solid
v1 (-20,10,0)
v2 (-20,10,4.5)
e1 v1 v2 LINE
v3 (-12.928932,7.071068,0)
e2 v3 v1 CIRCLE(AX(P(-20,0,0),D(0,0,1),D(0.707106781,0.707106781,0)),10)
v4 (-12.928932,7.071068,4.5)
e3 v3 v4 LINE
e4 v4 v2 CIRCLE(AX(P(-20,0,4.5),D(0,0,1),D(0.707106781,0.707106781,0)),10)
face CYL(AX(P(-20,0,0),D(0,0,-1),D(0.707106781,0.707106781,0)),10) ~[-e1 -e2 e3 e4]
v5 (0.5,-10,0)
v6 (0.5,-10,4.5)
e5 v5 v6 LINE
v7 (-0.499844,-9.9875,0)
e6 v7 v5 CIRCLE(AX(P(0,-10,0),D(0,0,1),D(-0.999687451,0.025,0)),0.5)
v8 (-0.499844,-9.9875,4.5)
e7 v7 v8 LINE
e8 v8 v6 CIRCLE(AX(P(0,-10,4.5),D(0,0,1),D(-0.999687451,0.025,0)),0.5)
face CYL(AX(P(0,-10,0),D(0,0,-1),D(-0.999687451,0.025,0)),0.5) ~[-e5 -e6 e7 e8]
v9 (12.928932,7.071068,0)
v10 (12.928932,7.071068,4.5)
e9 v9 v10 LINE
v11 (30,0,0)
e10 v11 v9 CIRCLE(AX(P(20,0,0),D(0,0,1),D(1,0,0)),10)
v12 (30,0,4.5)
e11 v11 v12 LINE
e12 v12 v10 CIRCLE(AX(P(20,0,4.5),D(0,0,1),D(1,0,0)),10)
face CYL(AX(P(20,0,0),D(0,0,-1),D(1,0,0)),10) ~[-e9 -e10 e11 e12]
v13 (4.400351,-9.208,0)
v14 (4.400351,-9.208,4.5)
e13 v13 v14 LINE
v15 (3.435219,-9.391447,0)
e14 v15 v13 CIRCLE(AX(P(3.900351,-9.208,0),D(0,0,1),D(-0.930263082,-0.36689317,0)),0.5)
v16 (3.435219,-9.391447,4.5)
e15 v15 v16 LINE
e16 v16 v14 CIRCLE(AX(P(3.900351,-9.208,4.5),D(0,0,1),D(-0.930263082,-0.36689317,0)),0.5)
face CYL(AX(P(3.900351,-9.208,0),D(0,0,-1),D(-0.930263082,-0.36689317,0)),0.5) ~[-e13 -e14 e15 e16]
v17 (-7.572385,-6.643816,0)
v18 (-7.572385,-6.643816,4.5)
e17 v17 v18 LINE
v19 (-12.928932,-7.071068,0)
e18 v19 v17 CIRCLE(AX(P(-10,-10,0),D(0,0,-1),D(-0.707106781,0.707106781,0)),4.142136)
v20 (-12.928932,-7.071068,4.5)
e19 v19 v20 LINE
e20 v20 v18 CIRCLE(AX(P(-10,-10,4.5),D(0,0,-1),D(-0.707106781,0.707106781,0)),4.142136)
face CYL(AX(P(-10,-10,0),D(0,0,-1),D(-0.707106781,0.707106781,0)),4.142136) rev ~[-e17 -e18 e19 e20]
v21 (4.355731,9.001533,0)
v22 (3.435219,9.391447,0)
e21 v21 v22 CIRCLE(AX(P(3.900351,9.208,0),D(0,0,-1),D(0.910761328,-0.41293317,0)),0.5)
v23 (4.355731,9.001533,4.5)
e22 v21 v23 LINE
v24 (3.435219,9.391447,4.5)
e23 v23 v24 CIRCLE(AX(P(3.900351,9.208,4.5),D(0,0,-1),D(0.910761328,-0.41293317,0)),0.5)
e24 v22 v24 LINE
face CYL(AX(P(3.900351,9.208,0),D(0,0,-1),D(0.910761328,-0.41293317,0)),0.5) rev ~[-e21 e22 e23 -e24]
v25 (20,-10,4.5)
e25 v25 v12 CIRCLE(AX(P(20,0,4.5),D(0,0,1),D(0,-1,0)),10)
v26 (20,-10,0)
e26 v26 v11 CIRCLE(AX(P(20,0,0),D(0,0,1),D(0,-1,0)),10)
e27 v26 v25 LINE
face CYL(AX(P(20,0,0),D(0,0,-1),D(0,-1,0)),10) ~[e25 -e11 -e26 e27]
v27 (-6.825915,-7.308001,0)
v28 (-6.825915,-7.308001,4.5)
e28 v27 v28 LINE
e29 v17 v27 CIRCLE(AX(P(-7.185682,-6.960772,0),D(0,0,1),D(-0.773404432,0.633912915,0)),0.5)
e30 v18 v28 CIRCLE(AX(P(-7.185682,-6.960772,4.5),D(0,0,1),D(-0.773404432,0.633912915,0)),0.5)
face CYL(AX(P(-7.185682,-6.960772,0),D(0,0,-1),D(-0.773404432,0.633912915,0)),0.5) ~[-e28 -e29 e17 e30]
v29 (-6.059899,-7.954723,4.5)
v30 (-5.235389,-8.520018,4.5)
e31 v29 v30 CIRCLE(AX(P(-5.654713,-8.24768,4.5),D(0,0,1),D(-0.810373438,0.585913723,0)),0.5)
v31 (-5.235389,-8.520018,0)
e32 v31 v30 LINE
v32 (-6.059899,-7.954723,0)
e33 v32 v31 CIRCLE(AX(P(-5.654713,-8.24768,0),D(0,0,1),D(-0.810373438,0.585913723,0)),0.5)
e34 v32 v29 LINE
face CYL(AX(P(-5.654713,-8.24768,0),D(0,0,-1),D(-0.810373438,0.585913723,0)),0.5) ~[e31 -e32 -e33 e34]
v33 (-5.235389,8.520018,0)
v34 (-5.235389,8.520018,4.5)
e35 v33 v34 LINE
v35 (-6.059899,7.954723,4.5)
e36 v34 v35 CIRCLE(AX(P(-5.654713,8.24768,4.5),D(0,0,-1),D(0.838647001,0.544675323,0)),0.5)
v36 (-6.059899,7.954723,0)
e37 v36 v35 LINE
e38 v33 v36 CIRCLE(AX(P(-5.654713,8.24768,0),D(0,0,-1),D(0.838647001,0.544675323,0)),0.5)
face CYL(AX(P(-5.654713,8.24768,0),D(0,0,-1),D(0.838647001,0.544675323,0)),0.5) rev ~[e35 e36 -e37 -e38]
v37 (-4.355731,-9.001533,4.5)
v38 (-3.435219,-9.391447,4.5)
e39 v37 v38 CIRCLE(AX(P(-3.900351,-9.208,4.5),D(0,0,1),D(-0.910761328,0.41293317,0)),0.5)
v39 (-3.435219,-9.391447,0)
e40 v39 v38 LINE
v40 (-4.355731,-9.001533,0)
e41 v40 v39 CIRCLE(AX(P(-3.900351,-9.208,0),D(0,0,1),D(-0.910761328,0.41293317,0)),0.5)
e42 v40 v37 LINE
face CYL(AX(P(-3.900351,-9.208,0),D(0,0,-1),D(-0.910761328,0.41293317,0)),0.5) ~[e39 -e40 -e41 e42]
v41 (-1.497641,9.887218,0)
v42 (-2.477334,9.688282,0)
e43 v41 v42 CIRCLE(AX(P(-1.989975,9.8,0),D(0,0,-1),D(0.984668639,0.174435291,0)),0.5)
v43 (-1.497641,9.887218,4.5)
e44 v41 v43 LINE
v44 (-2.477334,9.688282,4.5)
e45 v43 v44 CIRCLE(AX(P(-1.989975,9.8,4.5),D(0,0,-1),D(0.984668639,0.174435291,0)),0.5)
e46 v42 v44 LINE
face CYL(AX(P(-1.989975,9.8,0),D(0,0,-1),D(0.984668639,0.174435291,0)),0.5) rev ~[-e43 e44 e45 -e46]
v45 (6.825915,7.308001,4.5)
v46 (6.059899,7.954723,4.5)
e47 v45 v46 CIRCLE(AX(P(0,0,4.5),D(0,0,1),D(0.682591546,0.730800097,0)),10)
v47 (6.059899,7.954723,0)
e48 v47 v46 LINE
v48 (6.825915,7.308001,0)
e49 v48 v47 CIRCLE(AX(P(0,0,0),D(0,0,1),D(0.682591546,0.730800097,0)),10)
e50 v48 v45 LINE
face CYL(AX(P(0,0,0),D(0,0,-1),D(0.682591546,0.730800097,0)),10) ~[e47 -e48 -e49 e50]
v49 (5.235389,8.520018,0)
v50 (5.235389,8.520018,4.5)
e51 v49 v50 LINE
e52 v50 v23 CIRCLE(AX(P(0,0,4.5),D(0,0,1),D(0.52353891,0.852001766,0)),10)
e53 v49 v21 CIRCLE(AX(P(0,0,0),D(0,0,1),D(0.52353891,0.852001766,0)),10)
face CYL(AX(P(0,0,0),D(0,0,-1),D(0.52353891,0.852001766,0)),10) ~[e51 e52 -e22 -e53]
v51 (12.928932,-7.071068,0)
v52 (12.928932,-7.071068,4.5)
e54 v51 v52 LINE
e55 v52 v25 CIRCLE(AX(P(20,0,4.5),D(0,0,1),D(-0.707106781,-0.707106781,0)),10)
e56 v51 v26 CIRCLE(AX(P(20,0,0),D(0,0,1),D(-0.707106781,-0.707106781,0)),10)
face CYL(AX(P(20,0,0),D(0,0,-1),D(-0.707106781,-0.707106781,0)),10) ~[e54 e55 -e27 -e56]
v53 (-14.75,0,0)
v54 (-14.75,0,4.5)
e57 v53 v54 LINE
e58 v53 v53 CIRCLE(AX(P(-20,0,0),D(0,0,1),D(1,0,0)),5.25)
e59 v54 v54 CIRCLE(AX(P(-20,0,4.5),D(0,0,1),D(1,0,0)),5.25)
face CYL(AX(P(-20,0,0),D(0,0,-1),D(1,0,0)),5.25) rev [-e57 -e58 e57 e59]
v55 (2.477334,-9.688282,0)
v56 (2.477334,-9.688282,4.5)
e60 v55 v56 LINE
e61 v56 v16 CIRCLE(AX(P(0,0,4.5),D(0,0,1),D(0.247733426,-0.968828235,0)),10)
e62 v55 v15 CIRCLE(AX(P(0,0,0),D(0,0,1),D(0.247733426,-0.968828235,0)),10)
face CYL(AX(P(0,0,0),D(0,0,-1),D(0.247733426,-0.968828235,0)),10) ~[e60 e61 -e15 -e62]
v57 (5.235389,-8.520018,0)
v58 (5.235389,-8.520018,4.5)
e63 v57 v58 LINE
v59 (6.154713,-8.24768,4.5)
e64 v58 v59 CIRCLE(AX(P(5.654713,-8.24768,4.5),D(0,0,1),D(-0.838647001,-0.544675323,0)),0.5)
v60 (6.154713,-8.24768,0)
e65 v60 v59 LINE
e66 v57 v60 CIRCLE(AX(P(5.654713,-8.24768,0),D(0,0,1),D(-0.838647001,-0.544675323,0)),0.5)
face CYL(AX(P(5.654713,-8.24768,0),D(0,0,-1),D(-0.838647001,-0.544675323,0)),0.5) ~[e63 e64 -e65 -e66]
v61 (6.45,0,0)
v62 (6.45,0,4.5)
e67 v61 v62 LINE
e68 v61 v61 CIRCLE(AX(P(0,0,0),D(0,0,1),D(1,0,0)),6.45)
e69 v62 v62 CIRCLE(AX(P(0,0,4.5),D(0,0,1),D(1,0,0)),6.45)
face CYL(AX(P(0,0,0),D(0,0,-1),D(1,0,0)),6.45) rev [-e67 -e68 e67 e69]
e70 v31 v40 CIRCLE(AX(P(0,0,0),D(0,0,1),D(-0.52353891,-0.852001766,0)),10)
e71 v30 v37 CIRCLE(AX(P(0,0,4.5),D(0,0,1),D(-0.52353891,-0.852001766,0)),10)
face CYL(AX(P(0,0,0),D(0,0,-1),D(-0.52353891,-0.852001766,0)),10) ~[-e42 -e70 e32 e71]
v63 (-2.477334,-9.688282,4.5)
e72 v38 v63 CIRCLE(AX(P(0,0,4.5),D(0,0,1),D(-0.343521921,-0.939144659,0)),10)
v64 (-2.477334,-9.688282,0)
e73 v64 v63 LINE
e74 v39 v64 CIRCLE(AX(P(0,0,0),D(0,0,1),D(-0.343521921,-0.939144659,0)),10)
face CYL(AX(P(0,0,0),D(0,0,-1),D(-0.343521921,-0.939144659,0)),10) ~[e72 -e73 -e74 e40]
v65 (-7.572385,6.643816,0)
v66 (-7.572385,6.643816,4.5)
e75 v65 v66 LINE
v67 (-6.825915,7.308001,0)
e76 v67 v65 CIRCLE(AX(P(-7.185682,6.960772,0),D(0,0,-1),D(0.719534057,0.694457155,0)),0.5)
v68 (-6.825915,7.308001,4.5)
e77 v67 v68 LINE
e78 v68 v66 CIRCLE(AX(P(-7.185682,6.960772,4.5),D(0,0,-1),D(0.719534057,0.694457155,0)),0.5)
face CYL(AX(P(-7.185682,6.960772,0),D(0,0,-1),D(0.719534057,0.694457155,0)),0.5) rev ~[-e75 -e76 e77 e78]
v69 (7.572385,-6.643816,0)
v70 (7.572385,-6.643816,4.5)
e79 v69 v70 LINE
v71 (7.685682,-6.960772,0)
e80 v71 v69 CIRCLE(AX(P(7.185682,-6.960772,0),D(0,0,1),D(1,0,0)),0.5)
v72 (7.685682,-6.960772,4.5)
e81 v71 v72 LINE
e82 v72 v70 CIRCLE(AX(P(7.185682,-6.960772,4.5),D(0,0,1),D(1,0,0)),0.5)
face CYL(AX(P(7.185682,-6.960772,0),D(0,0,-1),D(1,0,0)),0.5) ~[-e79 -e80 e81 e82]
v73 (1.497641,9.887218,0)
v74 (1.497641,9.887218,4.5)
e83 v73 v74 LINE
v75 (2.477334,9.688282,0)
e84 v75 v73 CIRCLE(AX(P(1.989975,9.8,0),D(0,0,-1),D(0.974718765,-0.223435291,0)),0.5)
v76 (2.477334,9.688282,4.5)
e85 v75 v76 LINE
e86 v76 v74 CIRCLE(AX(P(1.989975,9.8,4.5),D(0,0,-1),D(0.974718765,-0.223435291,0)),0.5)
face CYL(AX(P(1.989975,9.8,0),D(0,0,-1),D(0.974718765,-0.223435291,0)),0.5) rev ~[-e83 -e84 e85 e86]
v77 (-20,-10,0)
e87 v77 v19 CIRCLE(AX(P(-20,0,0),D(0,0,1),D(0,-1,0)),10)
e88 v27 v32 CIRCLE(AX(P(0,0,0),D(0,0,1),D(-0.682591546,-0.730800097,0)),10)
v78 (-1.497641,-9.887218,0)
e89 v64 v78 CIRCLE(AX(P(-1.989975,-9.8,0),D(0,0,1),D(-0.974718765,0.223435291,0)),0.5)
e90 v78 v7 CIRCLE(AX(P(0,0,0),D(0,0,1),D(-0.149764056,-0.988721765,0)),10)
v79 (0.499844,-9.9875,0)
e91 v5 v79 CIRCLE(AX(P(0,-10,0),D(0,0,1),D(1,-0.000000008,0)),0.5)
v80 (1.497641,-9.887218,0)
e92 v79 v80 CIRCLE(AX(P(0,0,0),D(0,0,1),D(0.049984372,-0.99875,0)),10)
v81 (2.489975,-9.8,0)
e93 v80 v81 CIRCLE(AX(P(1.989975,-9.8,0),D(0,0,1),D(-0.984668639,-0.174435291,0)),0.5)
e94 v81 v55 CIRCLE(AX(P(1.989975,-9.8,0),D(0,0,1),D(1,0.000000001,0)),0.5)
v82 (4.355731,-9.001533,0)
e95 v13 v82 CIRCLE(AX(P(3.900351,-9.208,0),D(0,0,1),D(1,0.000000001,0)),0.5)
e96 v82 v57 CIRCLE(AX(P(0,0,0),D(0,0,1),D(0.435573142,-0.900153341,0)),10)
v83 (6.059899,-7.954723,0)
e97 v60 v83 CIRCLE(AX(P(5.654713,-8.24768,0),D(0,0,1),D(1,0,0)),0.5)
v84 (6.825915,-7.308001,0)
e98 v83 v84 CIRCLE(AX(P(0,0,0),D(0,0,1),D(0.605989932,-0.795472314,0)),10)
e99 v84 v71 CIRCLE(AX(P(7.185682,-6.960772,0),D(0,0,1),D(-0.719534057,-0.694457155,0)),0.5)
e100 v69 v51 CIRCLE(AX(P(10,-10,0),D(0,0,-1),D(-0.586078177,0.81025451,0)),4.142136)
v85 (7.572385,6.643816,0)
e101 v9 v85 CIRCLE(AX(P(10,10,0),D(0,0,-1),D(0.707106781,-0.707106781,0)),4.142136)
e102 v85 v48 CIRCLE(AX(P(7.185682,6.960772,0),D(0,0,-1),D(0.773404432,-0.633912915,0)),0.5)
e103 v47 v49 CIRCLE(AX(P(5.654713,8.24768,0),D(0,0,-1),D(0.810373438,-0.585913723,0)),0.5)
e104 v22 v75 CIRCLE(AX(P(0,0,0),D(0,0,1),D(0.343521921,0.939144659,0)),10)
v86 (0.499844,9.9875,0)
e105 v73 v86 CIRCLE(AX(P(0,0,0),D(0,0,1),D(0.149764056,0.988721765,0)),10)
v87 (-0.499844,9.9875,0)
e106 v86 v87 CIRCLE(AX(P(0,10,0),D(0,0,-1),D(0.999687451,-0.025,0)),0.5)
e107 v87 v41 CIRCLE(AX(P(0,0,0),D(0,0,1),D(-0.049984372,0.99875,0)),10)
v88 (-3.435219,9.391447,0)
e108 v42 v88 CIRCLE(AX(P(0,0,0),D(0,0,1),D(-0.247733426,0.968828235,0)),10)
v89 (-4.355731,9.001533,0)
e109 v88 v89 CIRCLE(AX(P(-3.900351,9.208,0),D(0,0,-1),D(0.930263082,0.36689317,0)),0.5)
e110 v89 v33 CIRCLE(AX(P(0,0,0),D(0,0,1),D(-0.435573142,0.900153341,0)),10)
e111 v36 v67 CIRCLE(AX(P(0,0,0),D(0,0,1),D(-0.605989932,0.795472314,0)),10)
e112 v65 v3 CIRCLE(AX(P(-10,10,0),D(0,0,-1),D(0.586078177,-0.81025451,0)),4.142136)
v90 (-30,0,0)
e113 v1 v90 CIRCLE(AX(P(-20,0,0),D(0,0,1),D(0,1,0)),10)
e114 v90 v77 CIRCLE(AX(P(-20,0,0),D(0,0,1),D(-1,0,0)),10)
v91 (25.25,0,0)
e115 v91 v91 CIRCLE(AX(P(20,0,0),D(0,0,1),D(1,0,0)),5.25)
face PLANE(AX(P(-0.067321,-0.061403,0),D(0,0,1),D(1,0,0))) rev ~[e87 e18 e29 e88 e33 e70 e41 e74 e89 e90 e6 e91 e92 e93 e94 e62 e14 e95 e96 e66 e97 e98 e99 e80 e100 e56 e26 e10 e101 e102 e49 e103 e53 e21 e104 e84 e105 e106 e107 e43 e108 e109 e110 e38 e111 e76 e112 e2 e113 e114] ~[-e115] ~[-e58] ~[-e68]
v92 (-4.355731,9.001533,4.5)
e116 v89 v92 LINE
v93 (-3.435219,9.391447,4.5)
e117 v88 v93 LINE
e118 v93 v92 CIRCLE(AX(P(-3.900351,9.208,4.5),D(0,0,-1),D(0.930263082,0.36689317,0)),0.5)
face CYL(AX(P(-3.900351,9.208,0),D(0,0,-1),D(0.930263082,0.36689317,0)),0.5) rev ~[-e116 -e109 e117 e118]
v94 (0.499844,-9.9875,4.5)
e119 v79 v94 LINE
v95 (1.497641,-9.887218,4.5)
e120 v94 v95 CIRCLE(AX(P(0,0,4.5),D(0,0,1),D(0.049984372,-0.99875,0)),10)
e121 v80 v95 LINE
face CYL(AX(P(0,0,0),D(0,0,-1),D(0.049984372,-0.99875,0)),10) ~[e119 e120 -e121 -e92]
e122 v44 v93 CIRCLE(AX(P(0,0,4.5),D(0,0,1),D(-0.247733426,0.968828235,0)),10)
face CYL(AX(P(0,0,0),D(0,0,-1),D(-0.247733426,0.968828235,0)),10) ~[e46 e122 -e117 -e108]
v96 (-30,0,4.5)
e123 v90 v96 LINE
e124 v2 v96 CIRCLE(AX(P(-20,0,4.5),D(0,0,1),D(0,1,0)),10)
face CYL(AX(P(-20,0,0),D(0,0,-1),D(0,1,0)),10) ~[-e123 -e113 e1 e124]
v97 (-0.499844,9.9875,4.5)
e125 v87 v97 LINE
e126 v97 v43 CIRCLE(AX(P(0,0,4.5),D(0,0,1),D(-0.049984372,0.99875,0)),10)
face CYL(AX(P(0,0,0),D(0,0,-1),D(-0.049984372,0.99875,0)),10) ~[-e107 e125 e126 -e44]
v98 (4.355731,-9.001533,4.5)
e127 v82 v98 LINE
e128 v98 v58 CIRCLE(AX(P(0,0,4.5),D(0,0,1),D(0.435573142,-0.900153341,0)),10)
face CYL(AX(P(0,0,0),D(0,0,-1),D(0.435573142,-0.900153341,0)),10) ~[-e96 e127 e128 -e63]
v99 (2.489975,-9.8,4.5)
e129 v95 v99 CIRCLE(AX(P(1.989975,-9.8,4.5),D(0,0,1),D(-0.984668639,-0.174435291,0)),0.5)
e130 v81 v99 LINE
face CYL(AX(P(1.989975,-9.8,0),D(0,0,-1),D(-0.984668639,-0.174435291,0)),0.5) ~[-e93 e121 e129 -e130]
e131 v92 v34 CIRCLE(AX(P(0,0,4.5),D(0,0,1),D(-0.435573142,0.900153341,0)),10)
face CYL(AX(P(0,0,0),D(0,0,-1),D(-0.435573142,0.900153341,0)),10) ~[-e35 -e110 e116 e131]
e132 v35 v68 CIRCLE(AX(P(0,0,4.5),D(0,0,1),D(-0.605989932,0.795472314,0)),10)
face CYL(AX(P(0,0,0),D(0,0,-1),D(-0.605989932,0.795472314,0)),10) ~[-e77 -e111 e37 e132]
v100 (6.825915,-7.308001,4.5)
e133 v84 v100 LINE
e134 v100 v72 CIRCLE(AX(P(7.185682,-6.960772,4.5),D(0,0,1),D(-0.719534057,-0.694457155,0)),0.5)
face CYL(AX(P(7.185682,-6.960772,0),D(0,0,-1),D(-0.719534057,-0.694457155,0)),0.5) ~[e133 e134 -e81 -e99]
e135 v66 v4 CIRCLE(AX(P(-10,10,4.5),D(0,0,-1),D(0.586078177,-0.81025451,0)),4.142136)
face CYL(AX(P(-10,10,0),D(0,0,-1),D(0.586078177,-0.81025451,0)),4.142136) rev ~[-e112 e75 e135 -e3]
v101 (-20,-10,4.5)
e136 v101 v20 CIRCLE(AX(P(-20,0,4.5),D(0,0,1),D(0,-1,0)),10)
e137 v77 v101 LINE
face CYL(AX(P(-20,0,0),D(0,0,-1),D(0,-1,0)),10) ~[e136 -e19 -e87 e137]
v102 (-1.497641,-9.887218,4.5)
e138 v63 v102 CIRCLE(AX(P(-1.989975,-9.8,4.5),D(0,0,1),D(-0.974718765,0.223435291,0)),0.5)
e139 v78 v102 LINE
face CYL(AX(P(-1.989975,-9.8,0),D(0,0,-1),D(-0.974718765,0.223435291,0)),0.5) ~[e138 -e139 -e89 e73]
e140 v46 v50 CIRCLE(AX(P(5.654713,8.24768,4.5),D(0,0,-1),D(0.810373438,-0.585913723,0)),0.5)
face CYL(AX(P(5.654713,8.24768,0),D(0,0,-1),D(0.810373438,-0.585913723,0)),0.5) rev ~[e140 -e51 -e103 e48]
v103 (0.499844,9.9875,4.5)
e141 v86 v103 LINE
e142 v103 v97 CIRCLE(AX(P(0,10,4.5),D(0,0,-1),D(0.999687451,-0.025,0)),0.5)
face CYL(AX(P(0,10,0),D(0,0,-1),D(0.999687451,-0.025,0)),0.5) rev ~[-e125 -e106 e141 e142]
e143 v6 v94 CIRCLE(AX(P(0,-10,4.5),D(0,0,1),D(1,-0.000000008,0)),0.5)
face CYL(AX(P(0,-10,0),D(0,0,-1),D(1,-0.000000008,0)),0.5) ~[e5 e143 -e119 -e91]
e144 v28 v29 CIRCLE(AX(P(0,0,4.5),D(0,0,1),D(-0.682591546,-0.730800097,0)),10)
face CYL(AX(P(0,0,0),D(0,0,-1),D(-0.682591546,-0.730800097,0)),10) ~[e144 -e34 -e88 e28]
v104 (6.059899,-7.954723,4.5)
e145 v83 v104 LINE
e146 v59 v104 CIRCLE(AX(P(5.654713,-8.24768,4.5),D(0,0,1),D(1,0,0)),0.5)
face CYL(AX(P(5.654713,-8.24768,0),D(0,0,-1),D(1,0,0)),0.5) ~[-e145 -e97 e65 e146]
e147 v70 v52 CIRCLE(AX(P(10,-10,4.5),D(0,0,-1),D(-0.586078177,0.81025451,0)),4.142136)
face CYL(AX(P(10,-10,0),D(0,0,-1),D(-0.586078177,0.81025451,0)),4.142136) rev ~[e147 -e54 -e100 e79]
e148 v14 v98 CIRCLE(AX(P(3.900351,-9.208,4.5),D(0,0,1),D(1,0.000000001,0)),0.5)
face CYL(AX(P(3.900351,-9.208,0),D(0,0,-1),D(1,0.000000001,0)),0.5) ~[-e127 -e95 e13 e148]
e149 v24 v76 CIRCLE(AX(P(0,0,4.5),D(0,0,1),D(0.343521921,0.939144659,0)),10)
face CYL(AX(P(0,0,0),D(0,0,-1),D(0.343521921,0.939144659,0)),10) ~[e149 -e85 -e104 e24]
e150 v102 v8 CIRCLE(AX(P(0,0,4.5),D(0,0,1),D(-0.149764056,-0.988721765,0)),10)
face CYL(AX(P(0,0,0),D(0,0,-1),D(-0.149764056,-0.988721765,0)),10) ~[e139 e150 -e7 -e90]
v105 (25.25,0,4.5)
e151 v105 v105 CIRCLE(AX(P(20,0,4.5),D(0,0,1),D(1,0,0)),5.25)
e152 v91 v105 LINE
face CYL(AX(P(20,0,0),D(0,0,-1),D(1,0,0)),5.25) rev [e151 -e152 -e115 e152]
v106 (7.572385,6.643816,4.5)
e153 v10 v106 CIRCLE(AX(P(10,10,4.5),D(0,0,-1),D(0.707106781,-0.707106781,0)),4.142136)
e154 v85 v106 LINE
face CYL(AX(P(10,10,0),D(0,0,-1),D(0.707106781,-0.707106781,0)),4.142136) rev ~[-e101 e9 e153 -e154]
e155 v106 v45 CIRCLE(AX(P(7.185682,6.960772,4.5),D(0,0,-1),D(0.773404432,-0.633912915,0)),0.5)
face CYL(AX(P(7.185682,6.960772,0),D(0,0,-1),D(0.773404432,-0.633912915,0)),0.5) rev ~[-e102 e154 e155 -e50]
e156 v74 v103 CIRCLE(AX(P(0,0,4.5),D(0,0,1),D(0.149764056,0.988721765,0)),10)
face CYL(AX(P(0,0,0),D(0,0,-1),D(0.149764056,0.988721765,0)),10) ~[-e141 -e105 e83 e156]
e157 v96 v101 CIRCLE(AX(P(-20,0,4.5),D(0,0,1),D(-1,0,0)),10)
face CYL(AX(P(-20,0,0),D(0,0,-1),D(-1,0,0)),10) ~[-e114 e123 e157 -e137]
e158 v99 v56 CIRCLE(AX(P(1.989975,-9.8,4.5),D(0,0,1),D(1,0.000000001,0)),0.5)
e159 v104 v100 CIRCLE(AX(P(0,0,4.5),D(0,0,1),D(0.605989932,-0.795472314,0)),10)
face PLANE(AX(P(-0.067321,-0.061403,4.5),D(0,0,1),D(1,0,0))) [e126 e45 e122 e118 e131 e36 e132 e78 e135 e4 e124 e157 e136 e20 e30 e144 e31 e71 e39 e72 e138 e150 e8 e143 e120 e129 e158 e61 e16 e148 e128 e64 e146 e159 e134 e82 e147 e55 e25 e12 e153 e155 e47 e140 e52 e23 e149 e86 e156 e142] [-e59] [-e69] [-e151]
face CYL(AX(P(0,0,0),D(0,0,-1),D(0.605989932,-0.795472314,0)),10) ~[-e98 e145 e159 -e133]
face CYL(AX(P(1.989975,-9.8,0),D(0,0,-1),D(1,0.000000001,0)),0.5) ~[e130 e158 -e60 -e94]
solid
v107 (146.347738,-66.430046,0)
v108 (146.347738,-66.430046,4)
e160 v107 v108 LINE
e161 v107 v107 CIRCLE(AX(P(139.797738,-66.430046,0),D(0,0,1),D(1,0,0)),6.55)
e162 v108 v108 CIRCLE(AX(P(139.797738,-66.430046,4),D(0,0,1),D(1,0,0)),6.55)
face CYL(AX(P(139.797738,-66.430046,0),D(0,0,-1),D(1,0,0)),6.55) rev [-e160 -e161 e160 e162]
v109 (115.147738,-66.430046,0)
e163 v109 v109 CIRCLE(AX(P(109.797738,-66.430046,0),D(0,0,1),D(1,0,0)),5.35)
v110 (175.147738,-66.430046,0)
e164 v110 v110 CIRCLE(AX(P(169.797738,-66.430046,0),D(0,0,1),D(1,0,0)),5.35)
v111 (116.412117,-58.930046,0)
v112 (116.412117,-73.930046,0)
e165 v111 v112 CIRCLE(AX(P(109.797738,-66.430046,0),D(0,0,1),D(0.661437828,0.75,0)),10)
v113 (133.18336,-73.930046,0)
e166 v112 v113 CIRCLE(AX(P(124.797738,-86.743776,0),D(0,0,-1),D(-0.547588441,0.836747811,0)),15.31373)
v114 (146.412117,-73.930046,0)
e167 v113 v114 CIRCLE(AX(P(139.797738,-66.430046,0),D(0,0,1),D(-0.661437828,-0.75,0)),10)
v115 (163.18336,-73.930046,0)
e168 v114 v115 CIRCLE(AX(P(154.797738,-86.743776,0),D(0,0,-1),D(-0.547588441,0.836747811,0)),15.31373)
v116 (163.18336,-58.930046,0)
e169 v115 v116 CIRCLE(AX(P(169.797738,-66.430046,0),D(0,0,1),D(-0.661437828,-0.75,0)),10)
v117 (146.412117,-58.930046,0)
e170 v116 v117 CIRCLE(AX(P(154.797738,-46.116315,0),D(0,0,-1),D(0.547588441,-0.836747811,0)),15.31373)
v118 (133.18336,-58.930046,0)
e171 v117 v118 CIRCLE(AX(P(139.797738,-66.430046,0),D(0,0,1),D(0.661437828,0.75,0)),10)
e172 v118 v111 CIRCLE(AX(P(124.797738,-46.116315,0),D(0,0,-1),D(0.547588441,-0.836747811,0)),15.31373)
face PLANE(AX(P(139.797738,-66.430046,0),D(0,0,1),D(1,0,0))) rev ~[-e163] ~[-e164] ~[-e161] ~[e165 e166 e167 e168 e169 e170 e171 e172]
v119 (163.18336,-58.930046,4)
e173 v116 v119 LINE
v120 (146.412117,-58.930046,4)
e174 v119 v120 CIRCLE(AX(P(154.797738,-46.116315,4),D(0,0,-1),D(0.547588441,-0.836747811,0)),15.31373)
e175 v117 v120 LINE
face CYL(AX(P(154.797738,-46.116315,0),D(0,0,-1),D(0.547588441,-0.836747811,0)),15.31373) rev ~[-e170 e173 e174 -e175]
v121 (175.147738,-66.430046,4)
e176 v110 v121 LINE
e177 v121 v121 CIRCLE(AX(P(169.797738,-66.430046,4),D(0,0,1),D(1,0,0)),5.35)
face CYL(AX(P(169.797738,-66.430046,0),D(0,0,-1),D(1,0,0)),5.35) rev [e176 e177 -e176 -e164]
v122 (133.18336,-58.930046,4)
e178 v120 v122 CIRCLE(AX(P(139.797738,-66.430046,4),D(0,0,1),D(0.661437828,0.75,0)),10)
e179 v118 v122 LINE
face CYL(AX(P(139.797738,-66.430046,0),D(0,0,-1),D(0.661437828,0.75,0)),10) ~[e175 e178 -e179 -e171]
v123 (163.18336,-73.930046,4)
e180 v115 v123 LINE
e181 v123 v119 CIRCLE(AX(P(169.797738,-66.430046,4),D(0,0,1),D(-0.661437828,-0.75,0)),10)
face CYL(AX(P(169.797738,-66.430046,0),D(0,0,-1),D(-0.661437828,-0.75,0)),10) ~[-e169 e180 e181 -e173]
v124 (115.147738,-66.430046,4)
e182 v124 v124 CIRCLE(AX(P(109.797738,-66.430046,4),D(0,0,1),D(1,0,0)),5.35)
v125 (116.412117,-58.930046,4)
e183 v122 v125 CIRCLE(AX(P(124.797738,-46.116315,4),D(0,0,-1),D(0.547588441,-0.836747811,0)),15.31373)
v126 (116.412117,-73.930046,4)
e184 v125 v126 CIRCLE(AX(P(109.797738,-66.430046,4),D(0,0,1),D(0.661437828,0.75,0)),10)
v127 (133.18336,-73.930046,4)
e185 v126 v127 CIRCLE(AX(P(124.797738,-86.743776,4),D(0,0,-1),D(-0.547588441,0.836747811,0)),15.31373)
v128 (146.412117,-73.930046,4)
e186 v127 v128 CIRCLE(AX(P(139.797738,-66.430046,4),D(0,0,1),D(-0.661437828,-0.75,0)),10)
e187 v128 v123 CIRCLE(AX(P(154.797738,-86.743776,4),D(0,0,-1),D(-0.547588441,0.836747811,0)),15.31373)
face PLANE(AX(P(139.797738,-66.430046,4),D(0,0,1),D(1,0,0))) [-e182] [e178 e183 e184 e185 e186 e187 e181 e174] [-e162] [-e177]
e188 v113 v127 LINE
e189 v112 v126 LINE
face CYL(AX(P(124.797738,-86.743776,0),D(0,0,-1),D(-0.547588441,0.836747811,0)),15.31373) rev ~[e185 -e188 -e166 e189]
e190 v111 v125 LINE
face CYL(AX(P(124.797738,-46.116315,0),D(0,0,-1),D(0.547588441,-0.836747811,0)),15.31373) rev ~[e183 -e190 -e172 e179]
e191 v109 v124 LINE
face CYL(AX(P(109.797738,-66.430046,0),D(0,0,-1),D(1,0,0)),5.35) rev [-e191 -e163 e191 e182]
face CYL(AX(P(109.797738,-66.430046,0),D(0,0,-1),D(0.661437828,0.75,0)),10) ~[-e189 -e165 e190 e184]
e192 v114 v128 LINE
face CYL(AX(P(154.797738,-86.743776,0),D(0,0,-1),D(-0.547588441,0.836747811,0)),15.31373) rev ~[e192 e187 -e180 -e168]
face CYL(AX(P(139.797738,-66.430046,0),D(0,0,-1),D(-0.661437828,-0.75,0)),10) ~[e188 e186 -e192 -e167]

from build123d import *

# Parameters (mm, degrees)
F0_R     = 5.25
F0_R_2   = 6.45
F1_DEPTH = 4.5
F3_R     = 5.35
F3_R_2   = 6.55
F4_DEPTH = 4


with BuildPart() as f1:
    # F0 (on Top) → F1 (new body)
    with BuildSketch(Plane.XY):
        with BuildLine():
            ThreePointArc((12.9289321881, -7.0710678119), (16.1731656763, -9.2387953251), (20, -10))
            ThreePointArc((20, -10), (27.0710678119, -7.0710678119), (30, 0))
            ThreePointArc((30, 0), (23.8268343237, 9.2387953251), (12.9289321881, 7.0710678119))
            ThreePointArc((12.9289321881, 7.0710678119), (10.3293413121, 5.870978103), (7.5723847064, 6.64381593))
            ThreePointArc((7.5723847064, 6.64381593), (6.8533170042, 6.5872309794), (6.8259154618, 7.3080009653))
            ThreePointArc((6.8259154618, 7.3080009653), (6.451016823, 7.6409673438), (6.0598993217, 7.9547231386))
            ThreePointArc((6.0598993217, 7.9547231386), (5.3719769724, 7.835296), (5.235389102, 8.5200176614))
            ThreePointArc((5.235389102, 8.5200176614), (4.8016, 8.7718092455), (4.3557314175, 9.0015334148))
            ThreePointArc((4.3557314175, 9.0015334148), (3.7053332158, 8.7476), (3.4352192125, 9.3914465852))
            ThreePointArc((3.4352192125, 9.3914465852), (2.96, 9.5518793962), (2.4773342567, 9.6882823545))
            ThreePointArc((2.4773342567, 9.6882823545), (1.8904761305, 9.31), (1.4976405546, 9.8872176455))
            ThreePointArc((1.4976405546, 9.8872176455), (1, 9.9498743711), (0.4998437256, 9.9875))
            ThreePointArc((0.4998437256, 9.9875), (0, 9.5), (-0.4998437256, 9.9875))
            ThreePointArc((-0.4998437256, 9.9875), (-1, 9.9498743711), (-1.4976405546, 9.8872176455))
            ThreePointArc((-1.4976405546, 9.8872176455), (-1.8904761305, 9.31), (-2.4773342567, 9.6882823545))
            ThreePointArc((-2.4773342567, 9.6882823545), (-2.96, 9.5518793962), (-3.4352192125, 9.3914465852))
            ThreePointArc((-3.4352192125, 9.3914465852), (-3.7053332158, 8.7476), (-4.3557314175, 9.0015334148))
            ThreePointArc((-4.3557314175, 9.0015334148), (-4.8016, 8.7718092455), (-5.235389102, 8.5200176614))
            ThreePointArc((-5.235389102, 8.5200176614), (-5.3719769724, 7.835296), (-6.0598993217, 7.9547231386))
            ThreePointArc((-6.0598993217, 7.9547231386), (-6.451016823, 7.6409673438), (-6.8259154618, 7.3080009653))
            ThreePointArc((-6.8259154618, 7.3080009653), (-6.8533170042, 6.5872309794), (-7.5723847064, 6.64381593))
            ThreePointArc((-7.5723847064, 6.64381593), (-10.3293413121, 5.870978103), (-12.9289321881, 7.0710678119))
            ThreePointArc((-12.9289321881, 7.0710678119), (-16.1731656763, 9.2387953251), (-20, 10))
            ThreePointArc((-20, 10), (-27.0710678119, 7.0710678119), (-30, 0))
            ThreePointArc((-30, 0), (-27.0710678119, -7.0710678119), (-20, -10))
            ThreePointArc((-20, -10), (-16.1731656763, -9.2387953251), (-12.9289321881, -7.0710678119))
            ThreePointArc((-12.9289321881, -7.0710678119), (-10.3293413121, -5.870978103), (-7.5723847064, -6.64381593))
            ThreePointArc((-7.5723847064, -6.64381593), (-7.0173838095, -6.489948053), (-6.6856824903, -6.9607723876))
            ThreePointArc((-6.6856824903, -6.9607723876), (-6.7220643747, -7.1480108528), (-6.8259154618, -7.3080009653))
            ThreePointArc((-6.8259154618, -7.3080009653), (-6.451016823, -7.6409673438), (-6.0598993217, -7.9547231386))
            ThreePointArc((-6.0598993217, -7.9547231386), (-5.5007537762, -7.7719734941), (-5.1547126026, -8.24768))
            ThreePointArc((-5.1547126026, -8.24768), (-5.1753058075, -8.3896980441), (-5.235389102, -8.5200176614))
            ThreePointArc((-5.235389102, -8.5200176614), (-4.8016, -8.7718092455), (-4.3557314175, -9.0015334148))
            ThreePointArc((-4.3557314175, -9.0015334148), (-3.794734306, -8.7192821202), (-3.4003507535, -9.208))
            ThreePointArc((-3.4003507535, -9.208), (-3.4091452107, -9.3013654902), (-3.4352192125, -9.3914465852))
            ThreePointArc((-3.4352192125, -9.3914465852), (-2.96, -9.5518793962), (-2.4773342567, -9.6882823545))
            ThreePointArc((-2.4773342567, -9.6882823545), (-1.9337596238, -9.3031702046), (-1.4899748742, -9.8))
            ThreePointArc((-1.4899748742, -9.8), (-1.4918949811, -9.8437769355), (-1.4976405546, -9.8872176455))
            ThreePointArc((-1.4976405546, -9.8872176455), (-1, -9.9498743711), (-0.4998437256, -9.9875))
            ThreePointArc((-0.4998437256, -9.9875), (0, -9.5), (0.4998437256, -9.9875))
            ThreePointArc((0.4998437256, -9.9875), (1, -9.9498743711), (1.4976405546, -9.8872176455))
            ThreePointArc((1.4976405546, -9.8872176455), (1.8904761305, -9.31), (2.4773342567, -9.6882823545))
            ThreePointArc((2.4773342567, -9.6882823545), (2.96, -9.5518793962), (3.4352192125, -9.3914465852))
            ThreePointArc((3.4352192125, -9.3914465852), (3.7053332158, -8.7476), (4.3557314175, -9.0015334148))
            ThreePointArc((4.3557314175, -9.0015334148), (4.8016, -8.7718092455), (5.235389102, -8.5200176614))
            ThreePointArc((5.235389102, -8.5200176614), (5.3719769724, -7.835296), (6.0598993217, -7.9547231386))
            ThreePointArc((6.0598993217, -7.9547231386), (6.451016823, -7.6409673438), (6.8259154618, -7.3080009653))
            ThreePointArc((6.8259154618, -7.3080009653), (6.8533170042, -6.5872309794), (7.5723847064, -6.64381593))
            ThreePointArc((7.5723847064, -6.64381593), (10.3293413121, -5.870978103), (12.9289321881, -7.0710678119))
        make_face()
        with Locations((-20, 0)):
            Circle(F0_R, mode=Mode.SUBTRACT)
        Circle(F0_R_2, mode=Mode.SUBTRACT)
        with Locations((20, 0)):
            Circle(F0_R, mode=Mode.SUBTRACT)
        with BuildLine():
            ThreePointArc((7.6856824903, -6.9607723876), (7.6565068249, -6.7924737068), (7.5723847064, -6.64381593))
            ThreePointArc((7.5723847064, -6.64381593), (7.3132200921, -6.8474611419), (7.0710678119, -7.0710678119))
            ThreePointArc((7.0710678119, -7.0710678119), (6.9495014466, -7.1905792286), (6.8259154618, -7.3080009653))
            ThreePointArc((6.8259154618, -7.3080009653), (7.3729209555, -7.4243905032), (7.6856824903, -6.9607723876))
        make_face()
        with BuildLine():
            ThreePointArc((7.0710678119, -7.0710678119), (7.3132200921, -6.8474611419), (7.5723847064, -6.64381593))
            ThreePointArc((7.5723847064, -6.64381593), (6.8533170042, -6.5872309794), (6.8259154618, -7.3080009653))
            ThreePointArc((6.8259154618, -7.3080009653), (6.9495014466, -7.1905792286), (7.0710678119, -7.0710678119))
        make_face()
        with BuildLine():
            ThreePointArc((6.1547126026, -8.24768), (6.1304191085, -8.0937211736), (6.0598993217, -7.9547231386))
            ThreePointArc((6.0598993217, -7.9547231386), (5.6547126026, -8.24768), (5.235389102, -8.5200176614))
            ThreePointArc((5.235389102, -8.5200176614), (5.7967306467, -8.7270867951), (6.1547126026, -8.24768))
        make_face()
        with BuildLine():
            ThreePointArc((5.235389102, -8.5200176614), (5.6547126026, -8.24768), (6.0598993217, -7.9547231386))
            ThreePointArc((6.0598993217, -7.9547231386), (5.3719769724, -7.835296), (5.235389102, -8.5200176614))
        make_face()
        with BuildLine():
            ThreePointArc((4.4003507535, -9.208), (4.3890686332, -9.1023835525), (4.3557314175, -9.0015334148))
            ThreePointArc((4.3557314175, -9.0015334148), (3.9003507535, -9.208), (3.4352192125, -9.3914465852))
            ThreePointArc((3.4352192125, -9.3914465852), (3.9937162437, -9.6992055428), (4.4003507535, -9.208))
        make_face()
        with BuildLine():
            ThreePointArc((3.4352192125, -9.3914465852), (3.9003507535, -9.208), (4.3557314175, -9.0015334148))
            ThreePointArc((4.3557314175, -9.0015334148), (3.7053332158, -8.7476), (3.4352192125, -9.3914465852))
        make_face()
        with BuildLine():
            ThreePointArc((2.4899748742, -9.8), (2.4868046696, -9.7437847496), (2.4773342567, -9.6882823545))
            ThreePointArc((2.4773342567, -9.6882823545), (1.9899748742, -9.8), (1.4976405546, -9.8872176455))
            ThreePointArc((1.4976405546, -9.8872176455), (2.0337518098, -10.2980798931), (2.4899748742, -9.8))
        make_face()
        with BuildLine():
            ThreePointArc((1.4976405546, -9.8872176455), (1.9899748742, -9.8), (2.4773342567, -9.6882823545))
            ThreePointArc((2.4773342567, -9.6882823545), (1.8904761305, -9.31), (1.4976405546, -9.8872176455))
        make_face()
        with BuildLine():
            ThreePointArc((0.5, -10), (0.4999609299, -9.9937495116), (0.4998437256, -9.9875))
            ThreePointArc((0.4998437256, -9.9875), (0, -10), (-0.4998437256, -9.9875))
            ThreePointArc((-0.4998437256, -9.9875), (-0.0062504884, -10.4999609299), (0.5, -10))
        make_face()
        with BuildLine():
            ThreePointArc((-0.4998437256, -9.9875), (0, -10), (0.4998437256, -9.9875))
            ThreePointArc((0.4998437256, -9.9875), (0, -9.5), (-0.4998437256, -9.9875))
        make_face()
        with BuildLine():
            ThreePointArc((-2.4773342567, -9.6882823545), (-2.0894736179, -10.29), (-1.4976405546, -9.8872176455))
            ThreePointArc((-1.4976405546, -9.8872176455), (-1.9899748742, -9.8), (-2.4773342567, -9.6882823545))
        make_face()
        with BuildLine():
            ThreePointArc((-2.4773342567, -9.6882823545), (-1.9899748742, -9.8), (-1.4976405546, -9.8872176455))
            ThreePointArc((-1.4976405546, -9.8872176455), (-1.4918949811, -9.8437769355), (-1.4899748742, -9.8))
            ThreePointArc((-1.4899748742, -9.8), (-1.9337596238, -9.3031702046), (-2.4773342567, -9.6882823545))
        make_face()
        with BuildLine():
            ThreePointArc((-4.3557314175, -9.0015334148), (-4.0953682911, -9.6684), (-3.4352192125, -9.3914465852))
            ThreePointArc((-3.4352192125, -9.3914465852), (-3.9003507535, -9.208), (-4.3557314175, -9.0015334148))
        make_face()
        with BuildLine():
            ThreePointArc((-4.3557314175, -9.0015334148), (-3.9003507535, -9.208), (-3.4352192125, -9.3914465852))
            ThreePointArc((-3.4352192125, -9.3914465852), (-3.4091452107, -9.3013654902), (-3.4003507535, -9.208))
            ThreePointArc((-3.4003507535, -9.208), (-3.794734306, -8.7192821202), (-4.3557314175, -9.0015334148))
        make_face()
        with BuildLine():
            ThreePointArc((-6.0598993217, -7.9547231386), (-5.9374482327, -8.660064), (-5.235389102, -8.5200176614))
            ThreePointArc((-5.235389102, -8.5200176614), (-5.6547126026, -8.24768), (-6.0598993217, -7.9547231386))
        make_face()
        with BuildLine():
            ThreePointArc((-6.0598993217, -7.9547231386), (-5.6547126026, -8.24768), (-5.235389102, -8.5200176614))
            ThreePointArc((-5.235389102, -8.5200176614), (-5.1753058075, -8.3896980441), (-5.1547126026, -8.24768))
            ThreePointArc((-5.1547126026, -8.24768), (-5.5007537762, -7.7719734941), (-6.0598993217, -7.9547231386))
        make_face()
        with BuildLine():
            ThreePointArc((-7.5723847064, -6.64381593), (-7.5180479764, -7.3343137958), (-6.8259154618, -7.3080009653))
            ThreePointArc((-6.8259154618, -7.3080009653), (-6.9495014466, -7.1905792286), (-7.0710678119, -7.0710678119))
            ThreePointArc((-7.0710678119, -7.0710678119), (-7.3132200921, -6.8474611419), (-7.5723847064, -6.64381593))
        make_face()
        with BuildLine():
            ThreePointArc((-7.0710678119, -7.0710678119), (-6.9495014466, -7.1905792286), (-6.8259154618, -7.3080009653))
            ThreePointArc((-6.8259154618, -7.3080009653), (-6.7220643747, -7.1480108528), (-6.6856824903, -6.9607723876))
            ThreePointArc((-6.6856824903, -6.9607723876), (-7.0173838095, -6.489948053), (-7.5723847064, -6.64381593))
            ThreePointArc((-7.5723847064, -6.64381593), (-7.3132200921, -6.8474611419), (-7.0710678119, -7.0710678119))
        make_face()
    extrude(amount=F1_DEPTH)


with BuildPart() as f4:
    # F3 (on Top) → F4 (new body)
    with BuildSketch(Plane.XY):
        with BuildLine():
            ThreePointArc((146.4121165976, -73.9300458055), (154.7977383199, -71.4300458055), (163.1833600423, -73.9300458055))
            ThreePointArc((163.1833600423, -73.9300458055), (179.7977383199, -66.4300458055), (163.1833600423, -58.9300458055))
            ThreePointArc((163.1833600423, -58.9300458055), (154.7977383199, -61.4300458055), (146.4121165976, -58.9300458055))
            ThreePointArc((146.4121165976, -58.9300458055), (139.7977383199, -56.4300458055), (133.1833600423, -58.9300458055))
            ThreePointArc((133.1833600423, -58.9300458055), (124.7977383199, -61.4300458055), (116.4121165976, -58.9300458055))
            ThreePointArc((116.4121165976, -58.9300458055), (99.7977383199, -66.4300458055), (116.4121165976, -73.9300458055))
            ThreePointArc((116.4121165976, -73.9300458055), (124.7977383199, -71.4300458055), (133.1833600423, -73.9300458055))
            ThreePointArc((133.1833600423, -73.9300458055), (139.7977383199, -76.4300458055), (146.4121165976, -73.9300458055))
        make_face()
        with Locations((109.7977383199, -66.4300458055)):
            Circle(F3_R, mode=Mode.SUBTRACT)
        with Locations((139.7977383199, -66.4300458055)):
            Circle(F3_R_2, mode=Mode.SUBTRACT)
        with Locations((169.7977383199, -66.4300458055)):
            Circle(F3_R, mode=Mode.SUBTRACT)
    extrude(amount=F4_DEPTH)


solid = Compound([f1.part, f4.part])
